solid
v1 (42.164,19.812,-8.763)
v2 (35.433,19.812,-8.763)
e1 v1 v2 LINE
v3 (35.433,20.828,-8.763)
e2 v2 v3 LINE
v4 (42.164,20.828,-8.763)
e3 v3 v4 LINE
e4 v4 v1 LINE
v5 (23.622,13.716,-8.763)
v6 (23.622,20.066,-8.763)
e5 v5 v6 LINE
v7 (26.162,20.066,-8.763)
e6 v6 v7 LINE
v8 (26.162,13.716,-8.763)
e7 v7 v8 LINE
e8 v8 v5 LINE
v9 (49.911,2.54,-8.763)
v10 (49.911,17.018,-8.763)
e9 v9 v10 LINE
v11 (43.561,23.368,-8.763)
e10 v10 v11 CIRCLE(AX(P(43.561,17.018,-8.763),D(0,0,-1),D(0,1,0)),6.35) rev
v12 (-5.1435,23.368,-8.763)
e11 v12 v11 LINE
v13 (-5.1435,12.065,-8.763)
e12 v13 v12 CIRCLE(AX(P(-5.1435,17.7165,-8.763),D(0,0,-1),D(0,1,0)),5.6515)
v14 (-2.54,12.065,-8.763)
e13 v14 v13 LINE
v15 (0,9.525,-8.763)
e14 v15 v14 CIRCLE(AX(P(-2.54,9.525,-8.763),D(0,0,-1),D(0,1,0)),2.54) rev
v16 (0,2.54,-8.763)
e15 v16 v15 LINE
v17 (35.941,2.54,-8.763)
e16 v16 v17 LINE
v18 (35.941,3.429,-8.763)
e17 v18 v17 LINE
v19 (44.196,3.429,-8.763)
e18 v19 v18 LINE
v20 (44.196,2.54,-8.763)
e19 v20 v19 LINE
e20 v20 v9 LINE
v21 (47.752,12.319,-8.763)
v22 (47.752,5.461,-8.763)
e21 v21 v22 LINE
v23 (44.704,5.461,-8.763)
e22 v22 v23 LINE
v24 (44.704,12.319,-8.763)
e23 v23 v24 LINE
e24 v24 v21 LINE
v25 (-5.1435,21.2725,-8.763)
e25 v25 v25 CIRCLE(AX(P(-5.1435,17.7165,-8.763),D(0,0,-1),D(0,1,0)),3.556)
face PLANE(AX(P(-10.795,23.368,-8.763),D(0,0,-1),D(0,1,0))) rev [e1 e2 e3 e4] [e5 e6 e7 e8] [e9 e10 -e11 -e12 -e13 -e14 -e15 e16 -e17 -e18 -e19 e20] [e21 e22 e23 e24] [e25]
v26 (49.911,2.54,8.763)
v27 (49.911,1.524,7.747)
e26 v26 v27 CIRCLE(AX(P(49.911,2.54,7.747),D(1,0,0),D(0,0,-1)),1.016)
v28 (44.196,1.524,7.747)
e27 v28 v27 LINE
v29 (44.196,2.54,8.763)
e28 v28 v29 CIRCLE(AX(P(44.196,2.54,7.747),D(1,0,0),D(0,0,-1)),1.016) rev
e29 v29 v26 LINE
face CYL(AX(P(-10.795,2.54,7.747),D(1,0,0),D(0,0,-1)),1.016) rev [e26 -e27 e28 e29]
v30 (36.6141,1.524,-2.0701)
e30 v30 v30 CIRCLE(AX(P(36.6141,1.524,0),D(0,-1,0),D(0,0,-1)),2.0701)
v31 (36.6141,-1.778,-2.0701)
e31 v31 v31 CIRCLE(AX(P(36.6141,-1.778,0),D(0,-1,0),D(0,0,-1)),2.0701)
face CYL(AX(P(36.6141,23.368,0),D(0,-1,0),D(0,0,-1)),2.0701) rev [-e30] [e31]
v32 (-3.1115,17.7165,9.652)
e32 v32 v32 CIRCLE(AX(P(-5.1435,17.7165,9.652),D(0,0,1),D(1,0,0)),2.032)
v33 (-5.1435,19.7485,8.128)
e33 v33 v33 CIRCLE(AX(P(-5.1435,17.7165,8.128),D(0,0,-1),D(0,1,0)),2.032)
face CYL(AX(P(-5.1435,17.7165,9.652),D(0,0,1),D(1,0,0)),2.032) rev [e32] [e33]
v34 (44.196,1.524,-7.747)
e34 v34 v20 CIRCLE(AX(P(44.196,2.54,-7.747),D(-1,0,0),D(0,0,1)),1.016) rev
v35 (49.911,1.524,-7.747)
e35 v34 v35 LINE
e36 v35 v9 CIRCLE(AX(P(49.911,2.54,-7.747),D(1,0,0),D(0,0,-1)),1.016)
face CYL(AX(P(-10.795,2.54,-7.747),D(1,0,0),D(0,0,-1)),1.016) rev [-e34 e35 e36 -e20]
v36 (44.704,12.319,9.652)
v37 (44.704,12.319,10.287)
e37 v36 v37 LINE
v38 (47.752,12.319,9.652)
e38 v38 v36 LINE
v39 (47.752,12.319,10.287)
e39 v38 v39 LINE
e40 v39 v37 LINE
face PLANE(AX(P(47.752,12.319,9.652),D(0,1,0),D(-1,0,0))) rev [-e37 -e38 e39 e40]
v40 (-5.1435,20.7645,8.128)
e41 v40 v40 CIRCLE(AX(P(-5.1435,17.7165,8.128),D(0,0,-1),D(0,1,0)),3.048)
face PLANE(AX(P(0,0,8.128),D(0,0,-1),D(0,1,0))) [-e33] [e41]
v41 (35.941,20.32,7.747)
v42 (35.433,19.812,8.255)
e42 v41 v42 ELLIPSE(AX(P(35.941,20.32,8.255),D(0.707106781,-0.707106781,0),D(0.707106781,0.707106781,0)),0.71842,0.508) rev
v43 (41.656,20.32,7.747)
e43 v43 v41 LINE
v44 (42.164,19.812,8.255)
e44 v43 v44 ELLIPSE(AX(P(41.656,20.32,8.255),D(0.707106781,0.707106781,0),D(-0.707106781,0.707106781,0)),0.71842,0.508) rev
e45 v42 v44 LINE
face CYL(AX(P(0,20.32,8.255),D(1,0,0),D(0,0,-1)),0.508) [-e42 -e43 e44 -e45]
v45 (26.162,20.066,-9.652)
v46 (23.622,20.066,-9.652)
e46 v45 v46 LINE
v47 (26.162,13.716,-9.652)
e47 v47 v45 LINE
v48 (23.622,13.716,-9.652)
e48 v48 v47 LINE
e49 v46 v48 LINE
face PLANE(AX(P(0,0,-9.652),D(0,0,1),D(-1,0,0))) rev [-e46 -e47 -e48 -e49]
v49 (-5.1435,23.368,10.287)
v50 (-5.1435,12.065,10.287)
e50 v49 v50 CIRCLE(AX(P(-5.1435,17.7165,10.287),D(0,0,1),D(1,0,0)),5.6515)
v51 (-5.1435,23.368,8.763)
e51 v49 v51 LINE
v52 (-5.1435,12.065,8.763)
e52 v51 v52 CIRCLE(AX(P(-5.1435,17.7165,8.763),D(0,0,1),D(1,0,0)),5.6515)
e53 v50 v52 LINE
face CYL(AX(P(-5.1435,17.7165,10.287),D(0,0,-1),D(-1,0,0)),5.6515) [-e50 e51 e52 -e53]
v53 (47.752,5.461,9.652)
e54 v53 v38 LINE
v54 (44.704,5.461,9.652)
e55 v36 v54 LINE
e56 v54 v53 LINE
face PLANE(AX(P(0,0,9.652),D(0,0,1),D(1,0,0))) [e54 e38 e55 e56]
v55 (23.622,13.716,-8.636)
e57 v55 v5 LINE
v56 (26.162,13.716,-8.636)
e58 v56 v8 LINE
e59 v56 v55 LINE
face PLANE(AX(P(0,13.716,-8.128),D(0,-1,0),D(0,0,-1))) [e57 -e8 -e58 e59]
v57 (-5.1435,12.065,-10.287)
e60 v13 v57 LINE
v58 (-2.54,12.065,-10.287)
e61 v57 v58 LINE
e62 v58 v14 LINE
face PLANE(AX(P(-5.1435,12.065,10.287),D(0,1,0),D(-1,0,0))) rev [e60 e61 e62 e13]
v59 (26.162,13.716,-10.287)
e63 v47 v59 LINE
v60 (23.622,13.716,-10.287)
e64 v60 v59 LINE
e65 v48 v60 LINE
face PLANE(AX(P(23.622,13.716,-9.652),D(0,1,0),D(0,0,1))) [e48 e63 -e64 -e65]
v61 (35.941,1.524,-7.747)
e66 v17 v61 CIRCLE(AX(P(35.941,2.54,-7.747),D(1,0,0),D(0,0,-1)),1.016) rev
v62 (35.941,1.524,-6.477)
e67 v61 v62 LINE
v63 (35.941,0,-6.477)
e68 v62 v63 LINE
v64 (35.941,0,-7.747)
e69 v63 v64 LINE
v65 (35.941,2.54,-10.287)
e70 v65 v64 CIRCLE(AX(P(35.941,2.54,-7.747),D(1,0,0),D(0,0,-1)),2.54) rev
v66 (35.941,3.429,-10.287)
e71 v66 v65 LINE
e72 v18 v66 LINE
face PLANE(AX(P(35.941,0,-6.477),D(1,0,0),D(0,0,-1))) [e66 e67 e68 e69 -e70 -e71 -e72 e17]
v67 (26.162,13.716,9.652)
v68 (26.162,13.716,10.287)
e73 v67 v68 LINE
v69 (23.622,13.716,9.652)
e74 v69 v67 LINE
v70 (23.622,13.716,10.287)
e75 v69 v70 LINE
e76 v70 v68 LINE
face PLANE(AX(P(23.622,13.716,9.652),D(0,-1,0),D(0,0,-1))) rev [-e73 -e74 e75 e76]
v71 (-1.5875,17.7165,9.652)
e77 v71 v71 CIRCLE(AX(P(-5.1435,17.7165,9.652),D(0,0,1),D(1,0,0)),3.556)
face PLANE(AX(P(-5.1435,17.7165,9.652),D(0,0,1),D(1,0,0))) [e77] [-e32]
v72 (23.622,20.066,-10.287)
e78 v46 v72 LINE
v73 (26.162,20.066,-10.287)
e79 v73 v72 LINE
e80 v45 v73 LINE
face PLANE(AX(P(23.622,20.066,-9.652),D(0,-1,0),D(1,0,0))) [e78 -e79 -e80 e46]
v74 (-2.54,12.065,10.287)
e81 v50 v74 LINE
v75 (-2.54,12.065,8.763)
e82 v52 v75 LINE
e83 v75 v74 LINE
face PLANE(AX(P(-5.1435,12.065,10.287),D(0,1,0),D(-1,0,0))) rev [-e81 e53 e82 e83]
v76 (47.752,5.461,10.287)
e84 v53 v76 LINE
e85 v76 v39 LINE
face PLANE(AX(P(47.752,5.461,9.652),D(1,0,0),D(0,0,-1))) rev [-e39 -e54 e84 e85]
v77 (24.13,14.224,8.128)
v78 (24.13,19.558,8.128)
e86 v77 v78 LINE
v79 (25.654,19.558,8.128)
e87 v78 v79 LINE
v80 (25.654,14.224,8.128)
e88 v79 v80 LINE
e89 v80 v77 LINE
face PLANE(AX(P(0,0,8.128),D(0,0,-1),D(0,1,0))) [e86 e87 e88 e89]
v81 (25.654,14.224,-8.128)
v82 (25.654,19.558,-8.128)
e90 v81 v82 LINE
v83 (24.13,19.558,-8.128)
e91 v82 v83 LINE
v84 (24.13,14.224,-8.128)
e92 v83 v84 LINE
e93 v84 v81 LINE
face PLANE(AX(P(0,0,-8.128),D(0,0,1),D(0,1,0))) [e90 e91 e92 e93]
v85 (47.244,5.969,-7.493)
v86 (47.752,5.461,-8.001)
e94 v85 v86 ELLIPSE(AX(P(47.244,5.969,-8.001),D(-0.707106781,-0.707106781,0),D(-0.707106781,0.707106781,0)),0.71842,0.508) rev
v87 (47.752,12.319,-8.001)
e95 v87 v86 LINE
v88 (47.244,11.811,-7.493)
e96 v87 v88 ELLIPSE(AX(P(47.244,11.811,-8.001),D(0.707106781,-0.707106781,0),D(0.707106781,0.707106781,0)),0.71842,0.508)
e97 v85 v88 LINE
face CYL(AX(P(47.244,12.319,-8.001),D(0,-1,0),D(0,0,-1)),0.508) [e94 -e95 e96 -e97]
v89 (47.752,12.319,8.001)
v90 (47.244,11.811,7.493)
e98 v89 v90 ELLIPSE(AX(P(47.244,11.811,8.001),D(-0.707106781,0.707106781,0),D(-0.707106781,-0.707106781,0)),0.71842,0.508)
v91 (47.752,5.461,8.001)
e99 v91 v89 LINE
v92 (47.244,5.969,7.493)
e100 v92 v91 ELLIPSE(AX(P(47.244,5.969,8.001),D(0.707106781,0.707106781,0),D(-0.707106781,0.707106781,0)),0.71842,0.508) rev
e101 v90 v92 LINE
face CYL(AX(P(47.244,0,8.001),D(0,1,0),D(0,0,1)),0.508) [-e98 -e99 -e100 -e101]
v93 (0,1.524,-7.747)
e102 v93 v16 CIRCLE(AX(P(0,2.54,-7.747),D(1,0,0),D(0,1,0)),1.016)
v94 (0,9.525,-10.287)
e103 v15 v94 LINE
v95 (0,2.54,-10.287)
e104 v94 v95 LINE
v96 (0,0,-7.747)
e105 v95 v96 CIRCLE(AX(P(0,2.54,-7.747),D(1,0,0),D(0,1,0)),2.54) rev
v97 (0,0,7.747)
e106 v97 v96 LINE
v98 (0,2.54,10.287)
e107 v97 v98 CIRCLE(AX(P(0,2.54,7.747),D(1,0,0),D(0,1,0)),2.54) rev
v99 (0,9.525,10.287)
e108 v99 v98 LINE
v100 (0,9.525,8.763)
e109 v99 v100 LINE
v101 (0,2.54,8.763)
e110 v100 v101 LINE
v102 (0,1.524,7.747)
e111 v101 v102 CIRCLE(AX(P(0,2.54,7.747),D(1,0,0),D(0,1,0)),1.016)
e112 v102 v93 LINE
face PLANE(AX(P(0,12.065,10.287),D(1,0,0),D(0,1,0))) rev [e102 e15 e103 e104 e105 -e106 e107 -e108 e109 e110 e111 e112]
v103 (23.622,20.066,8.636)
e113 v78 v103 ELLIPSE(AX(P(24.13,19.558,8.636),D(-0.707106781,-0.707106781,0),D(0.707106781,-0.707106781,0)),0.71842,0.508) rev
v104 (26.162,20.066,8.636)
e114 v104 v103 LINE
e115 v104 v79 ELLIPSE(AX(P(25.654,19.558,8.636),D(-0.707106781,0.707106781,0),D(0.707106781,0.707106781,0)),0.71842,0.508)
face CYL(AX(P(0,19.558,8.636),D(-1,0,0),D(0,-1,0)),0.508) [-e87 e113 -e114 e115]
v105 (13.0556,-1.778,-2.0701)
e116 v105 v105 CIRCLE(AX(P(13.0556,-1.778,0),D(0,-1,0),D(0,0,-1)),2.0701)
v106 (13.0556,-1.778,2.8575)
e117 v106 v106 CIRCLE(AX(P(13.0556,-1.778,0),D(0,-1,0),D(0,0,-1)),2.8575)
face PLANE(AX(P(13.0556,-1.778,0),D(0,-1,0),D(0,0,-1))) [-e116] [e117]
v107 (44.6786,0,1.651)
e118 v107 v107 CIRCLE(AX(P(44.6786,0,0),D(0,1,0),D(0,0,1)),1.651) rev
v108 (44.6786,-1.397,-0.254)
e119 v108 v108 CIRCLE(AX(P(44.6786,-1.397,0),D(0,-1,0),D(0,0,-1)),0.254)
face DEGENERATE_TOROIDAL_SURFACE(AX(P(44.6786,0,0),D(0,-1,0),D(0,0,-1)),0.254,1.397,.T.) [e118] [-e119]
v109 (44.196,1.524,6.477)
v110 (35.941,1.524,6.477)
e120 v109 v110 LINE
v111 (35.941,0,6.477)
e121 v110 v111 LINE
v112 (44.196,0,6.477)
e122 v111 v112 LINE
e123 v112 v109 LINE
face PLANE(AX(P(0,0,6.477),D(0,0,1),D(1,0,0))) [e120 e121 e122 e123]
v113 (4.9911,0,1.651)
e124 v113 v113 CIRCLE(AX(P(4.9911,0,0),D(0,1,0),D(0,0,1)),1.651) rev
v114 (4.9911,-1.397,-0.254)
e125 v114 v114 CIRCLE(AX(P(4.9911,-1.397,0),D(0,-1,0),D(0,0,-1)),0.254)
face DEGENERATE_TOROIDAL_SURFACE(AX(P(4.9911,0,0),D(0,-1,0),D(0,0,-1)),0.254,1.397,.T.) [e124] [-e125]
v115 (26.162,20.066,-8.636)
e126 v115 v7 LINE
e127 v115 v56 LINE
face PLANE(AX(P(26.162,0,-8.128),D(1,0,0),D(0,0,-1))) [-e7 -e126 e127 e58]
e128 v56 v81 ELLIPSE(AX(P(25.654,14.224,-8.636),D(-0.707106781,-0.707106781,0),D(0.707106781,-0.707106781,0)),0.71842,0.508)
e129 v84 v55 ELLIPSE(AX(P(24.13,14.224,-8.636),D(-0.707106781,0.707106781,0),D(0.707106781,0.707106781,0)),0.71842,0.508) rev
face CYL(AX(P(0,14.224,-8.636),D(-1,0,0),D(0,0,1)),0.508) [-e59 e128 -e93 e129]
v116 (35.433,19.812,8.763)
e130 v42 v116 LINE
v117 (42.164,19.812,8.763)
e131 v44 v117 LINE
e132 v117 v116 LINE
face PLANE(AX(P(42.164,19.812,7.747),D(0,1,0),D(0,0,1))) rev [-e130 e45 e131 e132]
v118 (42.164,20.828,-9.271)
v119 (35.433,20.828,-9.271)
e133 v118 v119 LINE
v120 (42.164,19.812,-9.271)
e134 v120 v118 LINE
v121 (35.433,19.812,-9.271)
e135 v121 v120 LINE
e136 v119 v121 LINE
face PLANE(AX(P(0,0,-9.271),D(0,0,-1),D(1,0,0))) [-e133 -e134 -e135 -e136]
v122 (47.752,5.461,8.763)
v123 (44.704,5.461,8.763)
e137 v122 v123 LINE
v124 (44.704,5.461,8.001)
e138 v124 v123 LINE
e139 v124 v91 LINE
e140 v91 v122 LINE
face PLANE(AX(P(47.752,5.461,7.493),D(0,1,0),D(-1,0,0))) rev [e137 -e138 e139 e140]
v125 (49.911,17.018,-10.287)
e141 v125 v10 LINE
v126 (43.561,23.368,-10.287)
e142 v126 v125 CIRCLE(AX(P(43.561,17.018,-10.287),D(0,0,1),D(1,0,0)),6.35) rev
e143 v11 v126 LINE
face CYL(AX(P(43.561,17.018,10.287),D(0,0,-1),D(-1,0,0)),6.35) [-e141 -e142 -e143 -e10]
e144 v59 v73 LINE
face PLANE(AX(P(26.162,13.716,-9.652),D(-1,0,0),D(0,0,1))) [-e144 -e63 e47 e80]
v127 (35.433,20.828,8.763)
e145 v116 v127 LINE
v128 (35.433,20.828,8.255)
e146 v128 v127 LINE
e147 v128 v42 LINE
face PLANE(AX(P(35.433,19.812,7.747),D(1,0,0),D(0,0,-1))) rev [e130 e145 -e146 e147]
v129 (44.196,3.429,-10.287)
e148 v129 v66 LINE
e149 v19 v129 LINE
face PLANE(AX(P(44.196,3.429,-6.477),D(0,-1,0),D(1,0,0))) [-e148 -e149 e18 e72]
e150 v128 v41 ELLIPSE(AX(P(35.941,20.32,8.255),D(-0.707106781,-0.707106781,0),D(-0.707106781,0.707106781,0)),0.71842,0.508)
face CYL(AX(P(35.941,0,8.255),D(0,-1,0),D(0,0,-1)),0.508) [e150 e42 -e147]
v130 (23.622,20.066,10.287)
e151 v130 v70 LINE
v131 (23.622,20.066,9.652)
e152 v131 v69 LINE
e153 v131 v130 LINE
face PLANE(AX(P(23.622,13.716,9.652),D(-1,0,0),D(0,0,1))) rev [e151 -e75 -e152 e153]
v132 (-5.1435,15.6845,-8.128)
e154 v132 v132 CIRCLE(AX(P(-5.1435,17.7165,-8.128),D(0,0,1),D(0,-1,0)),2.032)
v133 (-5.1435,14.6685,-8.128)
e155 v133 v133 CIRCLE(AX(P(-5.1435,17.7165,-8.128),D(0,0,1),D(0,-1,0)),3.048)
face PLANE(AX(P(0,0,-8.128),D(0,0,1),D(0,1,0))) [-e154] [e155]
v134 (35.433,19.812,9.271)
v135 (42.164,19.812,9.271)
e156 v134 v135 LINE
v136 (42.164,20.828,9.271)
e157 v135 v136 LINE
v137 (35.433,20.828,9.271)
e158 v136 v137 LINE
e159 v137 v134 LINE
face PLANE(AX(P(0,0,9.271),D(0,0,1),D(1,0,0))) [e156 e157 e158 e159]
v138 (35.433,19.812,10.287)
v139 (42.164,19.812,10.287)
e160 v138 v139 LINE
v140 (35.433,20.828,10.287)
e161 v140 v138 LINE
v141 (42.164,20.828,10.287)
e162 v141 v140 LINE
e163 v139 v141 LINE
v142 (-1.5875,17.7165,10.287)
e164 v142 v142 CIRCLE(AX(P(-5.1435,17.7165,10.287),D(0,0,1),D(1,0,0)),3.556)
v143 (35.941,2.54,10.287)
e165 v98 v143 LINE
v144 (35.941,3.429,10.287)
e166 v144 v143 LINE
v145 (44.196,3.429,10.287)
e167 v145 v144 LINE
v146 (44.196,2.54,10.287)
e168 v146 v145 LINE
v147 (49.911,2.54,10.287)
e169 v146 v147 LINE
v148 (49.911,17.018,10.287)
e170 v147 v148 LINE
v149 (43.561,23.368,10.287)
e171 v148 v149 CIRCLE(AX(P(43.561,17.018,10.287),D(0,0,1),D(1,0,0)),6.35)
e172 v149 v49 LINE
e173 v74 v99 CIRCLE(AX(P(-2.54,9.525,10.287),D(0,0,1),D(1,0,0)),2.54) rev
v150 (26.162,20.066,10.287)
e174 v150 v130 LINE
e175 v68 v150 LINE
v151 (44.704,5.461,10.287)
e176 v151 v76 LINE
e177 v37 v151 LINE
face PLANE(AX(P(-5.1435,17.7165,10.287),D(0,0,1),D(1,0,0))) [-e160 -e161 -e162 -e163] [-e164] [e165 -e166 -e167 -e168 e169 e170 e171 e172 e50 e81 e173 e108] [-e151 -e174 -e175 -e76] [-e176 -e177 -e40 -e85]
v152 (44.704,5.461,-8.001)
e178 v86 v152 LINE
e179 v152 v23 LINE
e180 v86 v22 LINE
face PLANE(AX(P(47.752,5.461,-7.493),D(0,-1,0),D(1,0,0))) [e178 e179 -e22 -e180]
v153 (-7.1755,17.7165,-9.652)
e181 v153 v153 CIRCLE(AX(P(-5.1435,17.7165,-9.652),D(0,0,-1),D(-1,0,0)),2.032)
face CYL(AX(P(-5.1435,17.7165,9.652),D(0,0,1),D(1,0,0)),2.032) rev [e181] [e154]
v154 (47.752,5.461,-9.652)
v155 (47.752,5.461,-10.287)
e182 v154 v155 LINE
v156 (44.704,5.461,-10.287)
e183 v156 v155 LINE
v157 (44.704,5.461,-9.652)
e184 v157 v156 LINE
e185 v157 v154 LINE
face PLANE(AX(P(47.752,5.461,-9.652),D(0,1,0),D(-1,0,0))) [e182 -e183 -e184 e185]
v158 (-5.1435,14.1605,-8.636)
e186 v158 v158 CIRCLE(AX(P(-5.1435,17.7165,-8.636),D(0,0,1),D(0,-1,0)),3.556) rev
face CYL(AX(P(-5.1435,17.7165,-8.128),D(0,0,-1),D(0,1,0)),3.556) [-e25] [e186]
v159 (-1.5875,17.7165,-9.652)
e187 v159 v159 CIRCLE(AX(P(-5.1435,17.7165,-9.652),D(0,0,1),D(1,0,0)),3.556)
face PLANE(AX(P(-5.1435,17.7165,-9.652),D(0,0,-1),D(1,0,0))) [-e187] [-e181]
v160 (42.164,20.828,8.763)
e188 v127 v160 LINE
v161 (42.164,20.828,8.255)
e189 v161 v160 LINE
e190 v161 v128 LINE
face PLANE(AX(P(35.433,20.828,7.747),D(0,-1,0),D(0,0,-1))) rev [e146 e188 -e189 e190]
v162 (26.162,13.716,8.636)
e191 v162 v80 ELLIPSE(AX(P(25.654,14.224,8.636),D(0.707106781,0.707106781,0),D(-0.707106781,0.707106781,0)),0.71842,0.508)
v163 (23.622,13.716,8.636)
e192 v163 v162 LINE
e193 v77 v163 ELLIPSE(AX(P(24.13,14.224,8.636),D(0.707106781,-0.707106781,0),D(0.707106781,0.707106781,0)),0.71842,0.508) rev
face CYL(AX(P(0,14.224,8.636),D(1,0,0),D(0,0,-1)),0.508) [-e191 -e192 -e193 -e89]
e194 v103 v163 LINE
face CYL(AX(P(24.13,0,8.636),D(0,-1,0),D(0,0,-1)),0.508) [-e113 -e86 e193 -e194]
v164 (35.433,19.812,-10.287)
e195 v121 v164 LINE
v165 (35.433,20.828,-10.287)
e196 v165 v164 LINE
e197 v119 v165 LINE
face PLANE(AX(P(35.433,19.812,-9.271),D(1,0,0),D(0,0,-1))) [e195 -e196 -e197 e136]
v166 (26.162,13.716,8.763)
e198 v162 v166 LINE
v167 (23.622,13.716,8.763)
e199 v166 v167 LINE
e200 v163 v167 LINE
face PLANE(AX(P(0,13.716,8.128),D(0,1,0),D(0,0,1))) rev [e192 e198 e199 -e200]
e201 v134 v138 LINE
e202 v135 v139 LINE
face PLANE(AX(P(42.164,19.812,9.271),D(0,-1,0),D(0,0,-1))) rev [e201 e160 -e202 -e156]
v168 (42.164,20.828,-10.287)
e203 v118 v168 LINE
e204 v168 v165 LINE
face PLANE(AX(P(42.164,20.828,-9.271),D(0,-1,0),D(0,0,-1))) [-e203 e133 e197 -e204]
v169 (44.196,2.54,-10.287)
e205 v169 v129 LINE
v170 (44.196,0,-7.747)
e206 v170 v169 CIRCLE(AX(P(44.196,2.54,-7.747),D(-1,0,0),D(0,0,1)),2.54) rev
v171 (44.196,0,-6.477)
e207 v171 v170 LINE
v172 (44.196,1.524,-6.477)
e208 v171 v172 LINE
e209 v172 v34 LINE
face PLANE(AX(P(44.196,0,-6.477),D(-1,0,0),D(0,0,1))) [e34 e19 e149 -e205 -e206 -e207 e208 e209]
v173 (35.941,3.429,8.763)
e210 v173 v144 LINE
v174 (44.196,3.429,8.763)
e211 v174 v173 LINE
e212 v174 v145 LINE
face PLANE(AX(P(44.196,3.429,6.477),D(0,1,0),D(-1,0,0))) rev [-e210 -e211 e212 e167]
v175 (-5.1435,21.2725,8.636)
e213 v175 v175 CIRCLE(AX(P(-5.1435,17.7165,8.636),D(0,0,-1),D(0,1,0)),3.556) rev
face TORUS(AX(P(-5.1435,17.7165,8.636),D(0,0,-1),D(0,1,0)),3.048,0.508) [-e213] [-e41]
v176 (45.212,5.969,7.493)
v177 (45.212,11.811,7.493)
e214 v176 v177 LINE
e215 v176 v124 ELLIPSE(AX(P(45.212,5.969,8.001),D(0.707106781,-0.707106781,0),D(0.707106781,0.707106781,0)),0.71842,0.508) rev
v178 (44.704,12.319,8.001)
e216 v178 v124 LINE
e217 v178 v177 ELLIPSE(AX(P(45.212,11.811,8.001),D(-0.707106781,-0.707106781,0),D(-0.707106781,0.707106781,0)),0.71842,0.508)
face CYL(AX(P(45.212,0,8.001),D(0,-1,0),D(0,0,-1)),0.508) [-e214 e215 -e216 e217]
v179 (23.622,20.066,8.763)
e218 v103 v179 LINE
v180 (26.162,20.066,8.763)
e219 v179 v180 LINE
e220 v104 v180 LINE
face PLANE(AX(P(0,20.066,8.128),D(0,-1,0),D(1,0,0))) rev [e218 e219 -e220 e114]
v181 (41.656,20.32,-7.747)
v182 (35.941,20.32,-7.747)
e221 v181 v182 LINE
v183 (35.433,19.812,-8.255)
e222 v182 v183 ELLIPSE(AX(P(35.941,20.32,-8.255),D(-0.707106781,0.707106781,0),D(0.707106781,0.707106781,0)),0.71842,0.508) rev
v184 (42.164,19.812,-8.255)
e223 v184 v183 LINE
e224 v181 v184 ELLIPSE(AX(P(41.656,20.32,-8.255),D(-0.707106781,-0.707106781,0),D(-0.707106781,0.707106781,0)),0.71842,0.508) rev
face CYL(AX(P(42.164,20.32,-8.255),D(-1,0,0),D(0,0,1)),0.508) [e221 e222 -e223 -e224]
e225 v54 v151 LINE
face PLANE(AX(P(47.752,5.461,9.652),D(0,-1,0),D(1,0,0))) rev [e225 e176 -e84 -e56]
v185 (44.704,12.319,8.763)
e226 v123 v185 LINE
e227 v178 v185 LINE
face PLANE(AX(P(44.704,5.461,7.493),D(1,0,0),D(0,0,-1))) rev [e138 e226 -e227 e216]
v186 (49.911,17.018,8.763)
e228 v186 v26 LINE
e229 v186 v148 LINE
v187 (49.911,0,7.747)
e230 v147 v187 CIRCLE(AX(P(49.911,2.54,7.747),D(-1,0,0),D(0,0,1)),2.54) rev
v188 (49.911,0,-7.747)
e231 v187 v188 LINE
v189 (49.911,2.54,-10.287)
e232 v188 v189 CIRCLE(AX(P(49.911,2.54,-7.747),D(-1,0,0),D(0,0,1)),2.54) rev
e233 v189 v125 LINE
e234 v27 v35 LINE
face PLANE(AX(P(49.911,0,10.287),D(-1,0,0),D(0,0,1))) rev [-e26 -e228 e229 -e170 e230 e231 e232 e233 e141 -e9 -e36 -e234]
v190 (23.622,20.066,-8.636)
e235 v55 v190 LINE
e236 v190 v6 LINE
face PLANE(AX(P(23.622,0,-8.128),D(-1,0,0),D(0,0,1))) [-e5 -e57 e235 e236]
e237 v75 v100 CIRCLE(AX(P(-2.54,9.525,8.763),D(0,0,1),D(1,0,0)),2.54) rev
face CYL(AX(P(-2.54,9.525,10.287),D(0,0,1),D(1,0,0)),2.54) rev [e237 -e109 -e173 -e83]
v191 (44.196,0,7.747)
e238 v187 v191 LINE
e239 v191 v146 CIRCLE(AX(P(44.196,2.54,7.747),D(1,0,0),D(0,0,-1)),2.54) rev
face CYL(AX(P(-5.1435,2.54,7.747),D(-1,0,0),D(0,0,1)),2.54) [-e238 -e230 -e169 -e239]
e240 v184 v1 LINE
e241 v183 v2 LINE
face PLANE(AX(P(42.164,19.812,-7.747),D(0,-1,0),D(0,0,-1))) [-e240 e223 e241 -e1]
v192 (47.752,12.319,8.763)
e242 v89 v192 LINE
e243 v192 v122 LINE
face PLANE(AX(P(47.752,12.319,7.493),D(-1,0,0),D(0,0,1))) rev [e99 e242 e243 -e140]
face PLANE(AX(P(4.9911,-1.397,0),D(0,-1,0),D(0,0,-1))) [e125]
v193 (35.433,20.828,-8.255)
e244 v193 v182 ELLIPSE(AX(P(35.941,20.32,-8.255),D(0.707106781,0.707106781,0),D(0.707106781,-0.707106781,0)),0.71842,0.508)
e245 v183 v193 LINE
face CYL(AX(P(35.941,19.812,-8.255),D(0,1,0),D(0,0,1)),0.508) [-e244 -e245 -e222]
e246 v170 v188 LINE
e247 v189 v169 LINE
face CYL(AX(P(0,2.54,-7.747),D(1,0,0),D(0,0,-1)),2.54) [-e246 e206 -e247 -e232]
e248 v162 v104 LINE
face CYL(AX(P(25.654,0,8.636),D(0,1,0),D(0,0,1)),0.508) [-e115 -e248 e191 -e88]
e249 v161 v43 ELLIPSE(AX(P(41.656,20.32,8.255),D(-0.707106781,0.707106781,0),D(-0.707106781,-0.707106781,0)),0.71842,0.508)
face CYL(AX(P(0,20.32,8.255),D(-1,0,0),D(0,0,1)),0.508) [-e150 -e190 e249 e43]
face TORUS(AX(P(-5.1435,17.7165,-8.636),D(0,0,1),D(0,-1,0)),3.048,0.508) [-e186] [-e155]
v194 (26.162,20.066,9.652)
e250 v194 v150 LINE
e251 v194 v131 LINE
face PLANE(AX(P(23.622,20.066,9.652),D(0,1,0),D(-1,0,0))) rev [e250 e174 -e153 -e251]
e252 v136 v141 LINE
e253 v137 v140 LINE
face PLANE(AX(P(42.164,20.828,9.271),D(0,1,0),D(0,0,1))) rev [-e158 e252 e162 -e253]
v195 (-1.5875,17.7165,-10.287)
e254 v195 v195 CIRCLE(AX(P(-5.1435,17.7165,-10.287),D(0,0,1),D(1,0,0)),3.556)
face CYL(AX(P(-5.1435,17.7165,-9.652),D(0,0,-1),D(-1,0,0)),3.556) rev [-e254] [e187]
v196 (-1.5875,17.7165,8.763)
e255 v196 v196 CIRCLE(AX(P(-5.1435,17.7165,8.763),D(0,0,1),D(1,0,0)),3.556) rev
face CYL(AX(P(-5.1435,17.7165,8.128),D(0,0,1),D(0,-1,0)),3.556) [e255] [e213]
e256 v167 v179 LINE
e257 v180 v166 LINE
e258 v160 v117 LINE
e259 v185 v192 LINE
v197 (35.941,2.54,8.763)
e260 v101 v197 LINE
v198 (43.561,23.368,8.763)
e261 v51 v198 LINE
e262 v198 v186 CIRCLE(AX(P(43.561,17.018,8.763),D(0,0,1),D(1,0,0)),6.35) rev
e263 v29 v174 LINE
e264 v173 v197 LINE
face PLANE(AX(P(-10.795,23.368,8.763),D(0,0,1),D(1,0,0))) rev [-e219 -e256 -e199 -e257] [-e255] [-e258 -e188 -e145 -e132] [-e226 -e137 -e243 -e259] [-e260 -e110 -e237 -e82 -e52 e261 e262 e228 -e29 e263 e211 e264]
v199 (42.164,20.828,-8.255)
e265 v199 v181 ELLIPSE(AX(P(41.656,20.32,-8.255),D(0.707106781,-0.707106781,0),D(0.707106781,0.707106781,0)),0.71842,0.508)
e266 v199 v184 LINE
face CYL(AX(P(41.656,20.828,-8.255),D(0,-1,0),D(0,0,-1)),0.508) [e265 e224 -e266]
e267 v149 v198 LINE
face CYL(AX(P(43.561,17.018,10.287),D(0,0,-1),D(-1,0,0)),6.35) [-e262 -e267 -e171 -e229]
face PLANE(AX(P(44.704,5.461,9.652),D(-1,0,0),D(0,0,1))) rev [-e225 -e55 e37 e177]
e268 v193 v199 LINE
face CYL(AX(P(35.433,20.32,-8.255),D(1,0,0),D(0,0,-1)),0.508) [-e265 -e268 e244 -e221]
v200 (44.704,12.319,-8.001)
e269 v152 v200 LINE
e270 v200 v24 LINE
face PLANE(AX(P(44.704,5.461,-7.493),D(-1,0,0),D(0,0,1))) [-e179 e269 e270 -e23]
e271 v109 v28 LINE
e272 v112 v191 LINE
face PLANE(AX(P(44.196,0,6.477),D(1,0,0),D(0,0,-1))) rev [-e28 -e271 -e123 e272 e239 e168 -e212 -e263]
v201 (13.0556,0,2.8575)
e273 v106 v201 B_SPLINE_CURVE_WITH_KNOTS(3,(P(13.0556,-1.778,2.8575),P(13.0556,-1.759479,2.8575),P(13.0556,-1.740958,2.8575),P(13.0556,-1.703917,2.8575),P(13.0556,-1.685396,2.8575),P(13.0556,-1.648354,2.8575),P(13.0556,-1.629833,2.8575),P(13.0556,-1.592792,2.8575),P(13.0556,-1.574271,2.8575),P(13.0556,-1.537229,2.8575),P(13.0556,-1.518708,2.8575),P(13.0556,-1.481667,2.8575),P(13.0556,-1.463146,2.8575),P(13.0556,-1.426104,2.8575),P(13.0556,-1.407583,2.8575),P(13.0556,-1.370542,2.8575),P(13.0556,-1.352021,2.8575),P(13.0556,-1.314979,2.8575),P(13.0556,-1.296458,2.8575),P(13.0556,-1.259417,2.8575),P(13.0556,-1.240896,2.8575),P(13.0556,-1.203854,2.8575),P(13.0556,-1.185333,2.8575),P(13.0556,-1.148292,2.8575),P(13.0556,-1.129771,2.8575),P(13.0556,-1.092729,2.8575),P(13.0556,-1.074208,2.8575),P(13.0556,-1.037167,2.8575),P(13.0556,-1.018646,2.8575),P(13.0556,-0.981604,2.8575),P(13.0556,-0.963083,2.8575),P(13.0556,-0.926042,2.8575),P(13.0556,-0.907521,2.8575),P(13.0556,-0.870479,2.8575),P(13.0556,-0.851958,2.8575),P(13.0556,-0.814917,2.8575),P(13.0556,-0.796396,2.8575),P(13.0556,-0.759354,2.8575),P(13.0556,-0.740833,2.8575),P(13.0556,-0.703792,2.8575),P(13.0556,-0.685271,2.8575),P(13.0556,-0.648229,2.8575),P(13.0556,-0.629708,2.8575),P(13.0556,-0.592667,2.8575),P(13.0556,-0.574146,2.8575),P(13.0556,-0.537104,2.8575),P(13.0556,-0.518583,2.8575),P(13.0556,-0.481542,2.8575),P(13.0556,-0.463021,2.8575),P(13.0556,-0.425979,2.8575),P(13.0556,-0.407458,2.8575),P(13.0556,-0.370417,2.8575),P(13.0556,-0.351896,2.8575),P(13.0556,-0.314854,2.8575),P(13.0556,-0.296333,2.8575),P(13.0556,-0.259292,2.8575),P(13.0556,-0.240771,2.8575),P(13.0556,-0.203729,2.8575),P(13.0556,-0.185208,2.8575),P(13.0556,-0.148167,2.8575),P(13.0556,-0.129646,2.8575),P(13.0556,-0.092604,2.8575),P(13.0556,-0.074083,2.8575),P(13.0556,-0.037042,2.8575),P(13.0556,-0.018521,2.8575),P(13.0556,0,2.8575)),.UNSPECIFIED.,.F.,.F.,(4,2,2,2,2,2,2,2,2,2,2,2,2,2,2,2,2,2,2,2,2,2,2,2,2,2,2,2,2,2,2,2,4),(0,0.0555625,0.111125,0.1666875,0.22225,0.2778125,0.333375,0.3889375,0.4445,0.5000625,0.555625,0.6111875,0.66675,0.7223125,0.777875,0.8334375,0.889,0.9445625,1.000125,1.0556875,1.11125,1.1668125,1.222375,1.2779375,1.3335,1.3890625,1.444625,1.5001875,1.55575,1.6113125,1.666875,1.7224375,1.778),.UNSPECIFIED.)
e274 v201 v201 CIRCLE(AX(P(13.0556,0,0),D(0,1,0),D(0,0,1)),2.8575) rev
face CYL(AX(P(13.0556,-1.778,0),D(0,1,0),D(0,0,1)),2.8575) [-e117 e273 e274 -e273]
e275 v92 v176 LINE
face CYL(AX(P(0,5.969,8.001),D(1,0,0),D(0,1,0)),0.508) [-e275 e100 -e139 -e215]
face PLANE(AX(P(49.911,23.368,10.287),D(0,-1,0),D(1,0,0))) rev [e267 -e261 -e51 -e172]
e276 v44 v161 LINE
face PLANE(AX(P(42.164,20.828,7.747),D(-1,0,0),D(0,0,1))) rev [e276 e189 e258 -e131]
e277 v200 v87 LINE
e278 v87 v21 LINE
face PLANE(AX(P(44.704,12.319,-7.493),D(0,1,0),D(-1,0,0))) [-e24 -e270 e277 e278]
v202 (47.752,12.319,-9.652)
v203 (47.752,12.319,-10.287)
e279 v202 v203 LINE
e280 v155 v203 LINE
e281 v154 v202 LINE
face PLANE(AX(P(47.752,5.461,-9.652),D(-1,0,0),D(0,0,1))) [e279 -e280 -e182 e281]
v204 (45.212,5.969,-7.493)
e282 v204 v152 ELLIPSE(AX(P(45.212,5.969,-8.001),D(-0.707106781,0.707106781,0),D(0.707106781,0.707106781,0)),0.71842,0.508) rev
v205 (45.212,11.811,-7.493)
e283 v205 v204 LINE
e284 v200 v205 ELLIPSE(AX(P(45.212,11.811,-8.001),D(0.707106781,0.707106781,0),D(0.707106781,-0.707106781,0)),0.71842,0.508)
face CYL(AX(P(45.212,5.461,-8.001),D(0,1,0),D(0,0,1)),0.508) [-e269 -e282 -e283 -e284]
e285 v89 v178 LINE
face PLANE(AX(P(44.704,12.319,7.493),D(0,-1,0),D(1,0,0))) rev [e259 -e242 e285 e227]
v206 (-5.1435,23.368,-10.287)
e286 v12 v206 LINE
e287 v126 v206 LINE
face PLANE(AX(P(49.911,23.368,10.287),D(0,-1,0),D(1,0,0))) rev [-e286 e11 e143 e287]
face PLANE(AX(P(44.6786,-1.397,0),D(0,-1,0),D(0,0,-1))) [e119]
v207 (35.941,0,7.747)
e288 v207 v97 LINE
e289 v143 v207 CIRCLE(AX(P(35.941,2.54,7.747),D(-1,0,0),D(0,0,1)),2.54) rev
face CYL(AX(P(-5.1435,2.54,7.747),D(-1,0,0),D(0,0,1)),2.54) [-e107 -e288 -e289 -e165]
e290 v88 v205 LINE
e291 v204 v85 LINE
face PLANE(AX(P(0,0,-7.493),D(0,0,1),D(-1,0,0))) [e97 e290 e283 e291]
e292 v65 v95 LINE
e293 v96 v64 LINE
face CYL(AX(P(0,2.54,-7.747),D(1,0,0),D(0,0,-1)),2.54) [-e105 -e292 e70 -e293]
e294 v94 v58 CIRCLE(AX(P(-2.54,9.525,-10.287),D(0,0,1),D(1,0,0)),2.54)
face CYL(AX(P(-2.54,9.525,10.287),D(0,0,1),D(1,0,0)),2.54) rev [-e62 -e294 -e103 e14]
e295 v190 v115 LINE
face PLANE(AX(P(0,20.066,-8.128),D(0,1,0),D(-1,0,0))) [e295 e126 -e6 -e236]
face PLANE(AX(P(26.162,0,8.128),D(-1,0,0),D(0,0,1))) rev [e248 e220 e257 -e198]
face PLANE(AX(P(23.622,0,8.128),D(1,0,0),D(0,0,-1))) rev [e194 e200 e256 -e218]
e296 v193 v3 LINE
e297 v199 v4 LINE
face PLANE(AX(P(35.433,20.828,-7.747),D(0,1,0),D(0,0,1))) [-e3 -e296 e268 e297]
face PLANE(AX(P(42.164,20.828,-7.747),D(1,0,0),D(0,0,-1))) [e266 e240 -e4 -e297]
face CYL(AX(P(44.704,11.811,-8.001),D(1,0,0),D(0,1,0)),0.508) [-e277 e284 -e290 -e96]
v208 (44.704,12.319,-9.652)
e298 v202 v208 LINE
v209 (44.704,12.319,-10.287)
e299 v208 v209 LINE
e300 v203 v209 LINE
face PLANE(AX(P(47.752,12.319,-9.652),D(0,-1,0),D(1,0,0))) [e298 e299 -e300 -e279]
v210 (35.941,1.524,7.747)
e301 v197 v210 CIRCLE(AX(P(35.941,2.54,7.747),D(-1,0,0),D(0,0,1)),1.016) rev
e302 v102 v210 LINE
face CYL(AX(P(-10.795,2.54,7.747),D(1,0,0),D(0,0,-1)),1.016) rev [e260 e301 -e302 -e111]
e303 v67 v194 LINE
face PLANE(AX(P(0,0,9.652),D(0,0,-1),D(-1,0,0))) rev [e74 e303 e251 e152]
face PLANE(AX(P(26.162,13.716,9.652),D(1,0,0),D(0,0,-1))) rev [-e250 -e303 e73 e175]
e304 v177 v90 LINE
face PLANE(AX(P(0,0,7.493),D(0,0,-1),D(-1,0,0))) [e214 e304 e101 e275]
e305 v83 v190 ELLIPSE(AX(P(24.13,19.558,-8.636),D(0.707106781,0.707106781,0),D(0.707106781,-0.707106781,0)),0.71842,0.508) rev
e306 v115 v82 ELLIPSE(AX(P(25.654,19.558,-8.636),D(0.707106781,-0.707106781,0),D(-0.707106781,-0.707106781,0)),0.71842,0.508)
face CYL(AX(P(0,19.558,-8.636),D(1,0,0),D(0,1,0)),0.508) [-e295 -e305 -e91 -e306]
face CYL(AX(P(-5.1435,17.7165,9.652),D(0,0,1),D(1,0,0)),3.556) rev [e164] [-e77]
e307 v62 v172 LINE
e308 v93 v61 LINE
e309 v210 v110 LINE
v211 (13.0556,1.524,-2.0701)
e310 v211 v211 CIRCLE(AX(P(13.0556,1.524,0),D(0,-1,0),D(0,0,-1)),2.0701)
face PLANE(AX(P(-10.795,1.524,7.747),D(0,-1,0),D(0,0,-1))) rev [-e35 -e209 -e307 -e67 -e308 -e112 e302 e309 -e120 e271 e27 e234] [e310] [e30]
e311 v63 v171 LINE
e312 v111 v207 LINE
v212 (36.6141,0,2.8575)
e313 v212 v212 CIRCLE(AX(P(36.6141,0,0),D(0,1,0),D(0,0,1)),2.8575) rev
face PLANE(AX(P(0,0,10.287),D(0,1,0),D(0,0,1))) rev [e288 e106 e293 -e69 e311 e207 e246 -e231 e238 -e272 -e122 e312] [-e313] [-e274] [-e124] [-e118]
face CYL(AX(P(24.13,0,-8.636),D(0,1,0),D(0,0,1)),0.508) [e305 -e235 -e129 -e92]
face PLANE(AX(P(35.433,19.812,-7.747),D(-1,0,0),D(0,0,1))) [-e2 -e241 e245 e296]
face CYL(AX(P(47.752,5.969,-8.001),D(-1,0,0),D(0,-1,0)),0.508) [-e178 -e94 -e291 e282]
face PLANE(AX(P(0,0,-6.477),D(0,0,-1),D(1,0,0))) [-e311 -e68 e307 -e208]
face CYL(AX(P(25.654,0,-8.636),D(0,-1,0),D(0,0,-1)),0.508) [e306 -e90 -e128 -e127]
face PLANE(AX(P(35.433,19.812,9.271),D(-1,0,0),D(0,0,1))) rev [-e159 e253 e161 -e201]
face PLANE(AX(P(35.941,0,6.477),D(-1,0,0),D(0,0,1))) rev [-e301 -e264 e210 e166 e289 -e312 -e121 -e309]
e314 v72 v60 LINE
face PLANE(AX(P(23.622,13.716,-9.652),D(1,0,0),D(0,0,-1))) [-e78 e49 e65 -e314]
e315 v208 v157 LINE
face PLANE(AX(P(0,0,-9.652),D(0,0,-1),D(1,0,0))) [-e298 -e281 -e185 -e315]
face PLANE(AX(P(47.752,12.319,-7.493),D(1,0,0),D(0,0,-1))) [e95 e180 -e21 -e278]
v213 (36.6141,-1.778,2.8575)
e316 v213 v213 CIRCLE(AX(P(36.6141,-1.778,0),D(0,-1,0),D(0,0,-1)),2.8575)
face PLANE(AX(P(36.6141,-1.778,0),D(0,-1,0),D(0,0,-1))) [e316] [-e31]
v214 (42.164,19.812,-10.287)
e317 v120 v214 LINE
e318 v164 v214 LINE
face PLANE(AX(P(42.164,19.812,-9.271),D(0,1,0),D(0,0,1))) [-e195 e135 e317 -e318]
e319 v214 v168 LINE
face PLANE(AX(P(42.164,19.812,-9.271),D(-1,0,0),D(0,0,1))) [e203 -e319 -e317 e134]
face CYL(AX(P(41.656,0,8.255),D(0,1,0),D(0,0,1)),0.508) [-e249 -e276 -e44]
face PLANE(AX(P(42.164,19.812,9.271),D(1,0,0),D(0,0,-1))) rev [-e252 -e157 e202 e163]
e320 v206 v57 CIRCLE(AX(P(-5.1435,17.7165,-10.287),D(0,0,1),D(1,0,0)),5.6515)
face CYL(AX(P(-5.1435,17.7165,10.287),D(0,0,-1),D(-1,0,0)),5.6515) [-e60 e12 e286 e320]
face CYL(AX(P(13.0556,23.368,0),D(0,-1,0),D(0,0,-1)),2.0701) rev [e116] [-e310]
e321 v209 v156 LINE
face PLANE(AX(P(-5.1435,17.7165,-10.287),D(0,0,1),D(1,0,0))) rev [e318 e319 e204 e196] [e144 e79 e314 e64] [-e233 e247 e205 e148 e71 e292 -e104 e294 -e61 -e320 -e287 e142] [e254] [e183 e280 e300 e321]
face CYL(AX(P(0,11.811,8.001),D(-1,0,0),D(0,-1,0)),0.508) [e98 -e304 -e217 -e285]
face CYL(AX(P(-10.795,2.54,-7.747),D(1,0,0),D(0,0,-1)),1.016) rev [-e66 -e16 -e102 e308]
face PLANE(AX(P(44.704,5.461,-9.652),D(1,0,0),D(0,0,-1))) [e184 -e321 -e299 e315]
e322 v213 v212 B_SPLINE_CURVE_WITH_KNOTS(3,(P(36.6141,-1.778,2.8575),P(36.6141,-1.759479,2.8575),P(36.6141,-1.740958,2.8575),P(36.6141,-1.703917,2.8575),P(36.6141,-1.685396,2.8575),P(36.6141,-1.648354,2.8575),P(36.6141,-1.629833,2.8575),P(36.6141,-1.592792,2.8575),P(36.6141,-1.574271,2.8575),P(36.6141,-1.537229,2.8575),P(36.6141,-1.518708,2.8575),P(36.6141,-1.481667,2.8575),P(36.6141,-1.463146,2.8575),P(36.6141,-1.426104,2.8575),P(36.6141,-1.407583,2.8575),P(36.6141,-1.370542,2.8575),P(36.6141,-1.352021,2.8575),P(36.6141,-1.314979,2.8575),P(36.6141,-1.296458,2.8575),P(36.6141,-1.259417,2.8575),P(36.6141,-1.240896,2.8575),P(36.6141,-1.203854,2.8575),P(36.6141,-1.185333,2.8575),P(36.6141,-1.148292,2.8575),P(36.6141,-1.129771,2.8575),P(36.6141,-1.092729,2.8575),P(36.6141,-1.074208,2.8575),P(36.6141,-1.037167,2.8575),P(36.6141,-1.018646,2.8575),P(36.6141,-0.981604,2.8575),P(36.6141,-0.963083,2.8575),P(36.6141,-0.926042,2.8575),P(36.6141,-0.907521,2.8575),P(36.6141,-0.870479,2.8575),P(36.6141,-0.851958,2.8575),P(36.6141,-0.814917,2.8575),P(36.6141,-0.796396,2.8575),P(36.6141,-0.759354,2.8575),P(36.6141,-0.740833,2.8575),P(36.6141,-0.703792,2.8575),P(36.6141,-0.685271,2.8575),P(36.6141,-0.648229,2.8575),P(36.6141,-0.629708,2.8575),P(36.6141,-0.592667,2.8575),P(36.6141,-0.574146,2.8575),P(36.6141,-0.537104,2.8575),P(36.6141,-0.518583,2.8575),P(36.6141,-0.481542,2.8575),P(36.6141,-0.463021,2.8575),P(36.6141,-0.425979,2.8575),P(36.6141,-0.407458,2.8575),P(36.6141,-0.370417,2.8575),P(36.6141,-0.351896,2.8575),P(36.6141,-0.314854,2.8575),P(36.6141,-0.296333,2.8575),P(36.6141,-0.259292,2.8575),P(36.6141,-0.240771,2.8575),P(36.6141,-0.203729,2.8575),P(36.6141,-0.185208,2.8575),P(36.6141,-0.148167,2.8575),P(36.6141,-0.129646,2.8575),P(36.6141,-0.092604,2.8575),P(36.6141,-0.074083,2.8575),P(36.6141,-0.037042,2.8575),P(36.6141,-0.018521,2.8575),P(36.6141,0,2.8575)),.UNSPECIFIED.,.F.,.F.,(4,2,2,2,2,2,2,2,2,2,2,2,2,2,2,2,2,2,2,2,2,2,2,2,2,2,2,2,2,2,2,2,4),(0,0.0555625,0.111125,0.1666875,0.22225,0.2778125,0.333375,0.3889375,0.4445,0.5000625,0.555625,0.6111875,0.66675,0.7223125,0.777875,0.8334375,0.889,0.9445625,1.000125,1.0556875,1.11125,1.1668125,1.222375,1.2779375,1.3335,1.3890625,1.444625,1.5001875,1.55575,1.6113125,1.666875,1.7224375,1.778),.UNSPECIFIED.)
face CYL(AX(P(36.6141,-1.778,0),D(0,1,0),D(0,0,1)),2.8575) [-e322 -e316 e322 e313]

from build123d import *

# Parameters (mm, degrees)
BOSS_EXTRUDE1_DEPTH       = 10.287
SKETCH2_R                 = 3.556
CUT_EXTRUDE1_DEPTH        = 0.635
SKETCH3_W                 = 3.048
SKETCH3_H                 = 6.858
CUT_EXTRUDE2_DEPTH        = 0.635
SKETCH4_W                 = 6.731
SKETCH4_H                 = 1.016
CUT_EXTRUDE3_DEPTH        = 1.016
SKETCH5_W                 = 2.54
SKETCH5_H                 = 6.35
CUT_EXTRUDE4_DEPTH        = 0.635
FILLET1_R                 = 6.35
FILLET2_R                 = 2.54
CUT_EXTRUDE5_DEPTH        = 66.856694641
SKETCH9_W                 = 2.54
SKETCH9_H                 = 6.35
SKETCH9_R                 = 3.556
BOSS_EXTRUDE2_DEPTH       = 0.635
SKETCH10_W                = 6.731
SKETCH10_H                = 1.016
BOSS_EXTRUDE3_DEPTH       = 1.016
SKETCH12_W                = 3.048
SKETCH12_H                = 6.858
BOSS_EXTRUDE4_DEPTH       = 1.27
FILLET5_R                 = 0.508
FILLET5_OF_MIRROR4_R      = 0.508
F_1_0_16_DIAMETER_HOLE1_D = 4.064
SKETCH15_R                = 1.651
BOSS_EXTRUDE5_DEPTH       = 1.397
FILLET6_R                 = 1.397
SKETCH16_R                = 2.8575
BOSS_EXTRUDE6_DEPTH       = 3.302
SKETCH20_R                = 2.0701
CUT_EXTRUDE6_DEPTH        = 57.826504432
SKETCH21_W                = 8.255
SKETCH21_H                = 3.429
CUT_EXTRUDE7_DEPTH        = 3.81


with BuildPart() as part:
    # Sketch1 → Boss-Extrude1 (new, symmetric)
    with BuildSketch(Plane.XY):
        with BuildLine():
            Line((0, 0), (49.911, 0))
            Line((49.911, 0), (49.911, 23.368))
            Line((49.911, 23.368), (-5.1435, 23.368))
            ThreePointArc((-5.1435, 23.368), (-10.795, 17.7165), (-5.1435, 12.065))
            Line((-5.1435, 12.065), (0, 12.065))
            Line((0, 12.065), (0, 0))
        make_face()
    extrude(amount=BOSS_EXTRUDE1_DEPTH, both=True)

    # Sketch2 → Cut-Extrude1 (cut)
    with BuildSketch(Plane.XY.offset(10.287)):
        with Locations((-5.1435, 17.7165)):
            Circle(SKETCH2_R)
    cut_extrude1 = extrude(amount=-CUT_EXTRUDE1_DEPTH, mode=Mode.SUBTRACT)

    # Mirror1: Cut-Extrude1 across plane
    add(cut_extrude1.mirror(Plane.XY), mode=Mode.SUBTRACT)

    # Sketch3 → Cut-Extrude2 (cut)
    with BuildSketch(Plane.XY.offset(10.287)):
        with Locations((46.228, 8.89)):
            Rectangle(SKETCH3_W, SKETCH3_H)
    cut_extrude2 = extrude(amount=-CUT_EXTRUDE2_DEPTH, mode=Mode.SUBTRACT)

    # Sketch4 → Cut-Extrude3 (cut)
    with BuildSketch(Plane.XY.offset(10.287)):
        with Locations((38.7985, 20.32)):
            Rectangle(SKETCH4_W, SKETCH4_H)
    cut_extrude3 = extrude(amount=-CUT_EXTRUDE3_DEPTH, mode=Mode.SUBTRACT)

    # Sketch5 → Cut-Extrude4 (cut)
    with BuildSketch(Plane.XY.offset(10.287)):
        with Locations((24.892, 16.891)):
            Rectangle(SKETCH5_W, SKETCH5_H)
    cut_extrude4 = extrude(amount=-CUT_EXTRUDE4_DEPTH, mode=Mode.SUBTRACT)

    # Mirror2: Cut-Extrude2, Cut-Extrude3, Cut-Extrude4 across plane
    add(cut_extrude2.mirror(Plane.XY), mode=Mode.SUBTRACT)
    add(cut_extrude3.mirror(Plane.XY), mode=Mode.SUBTRACT)
    add(cut_extrude4.mirror(Plane.XY), mode=Mode.SUBTRACT)

    # Fillet1
    fillet1_edges = [part.edges().sort_by_distance(p)[0] for p in [
        (49.911, 23.368, 0),
    ]]
    fillet(fillet1_edges, radius=FILLET1_R)

    # Fillet2
    fillet2_edges = [part.edges().sort_by_distance(p)[0] for p in [
        (0, 12.065, 0),
        (24.9555, 0, -10.287),
        (24.9555, 0, 10.287),
    ]]
    fillet(fillet2_edges, radius=FILLET2_R)

    # Sketch8 → Cut-Extrude5 (cut, through all)
    with BuildSketch(Plane(origin=(49.911, 0, 0), x_dir=(0, 0, -1), z_dir=(1, 0, 0))):
        with BuildLine():
            Line((-8.763, 23.368), (-8.763, 2.54))
            ThreePointArc((-8.763, 2.54), (-8.46542049, 1.82157951), (-7.747, 1.524))
            Line((-7.747, 1.524), (7.747, 1.524))
            ThreePointArc((7.747, 1.524), (8.46542049, 1.82157951), (8.763, 2.54))
            Line((8.763, 2.54), (8.763, 23.368))
            Line((8.763, 23.368), (-8.763, 23.368))
        make_face()
    extrude(amount=-CUT_EXTRUDE5_DEPTH, mode=Mode.SUBTRACT)

    # Sketch9 → Boss-Extrude2 (add)
    with BuildSketch(Plane(origin=(0, 0, 8.763), x_dir=(-1, 0, 0), z_dir=(0, 0, -1))):
        with Locations((-24.892, 16.891)):
            Rectangle(SKETCH9_W, SKETCH9_H)
        with Locations(Location((5.1435, 17.7165, 0), (0, 0, 180))):
            Circle(SKETCH9_R)
    boss_extrude2 = extrude(amount=BOSS_EXTRUDE2_DEPTH)

    # Sketch10 → Boss-Extrude3 (add)
    with BuildSketch(Plane(origin=(0, 0, 8.763), x_dir=(-1, 0, 0), z_dir=(0, 0, -1))):
        with Locations((-38.7985, 20.32)):
            Rectangle(SKETCH10_W, SKETCH10_H)
    boss_extrude3 = extrude(amount=BOSS_EXTRUDE3_DEPTH)

    # Sketch12 → Boss-Extrude4 (add)
    with BuildSketch(Plane(origin=(0, 0, 8.763), x_dir=(-1, 0, 0), z_dir=(0, 0, -1))):
        with Locations((-46.228, 8.89)):
            Rectangle(SKETCH12_W, SKETCH12_H)
    boss_extrude4 = extrude(amount=BOSS_EXTRUDE4_DEPTH)

    # Fillet5
    fillet5_edges = [part.edges().sort_by_distance(p)[0] for p in [
        (26.162, 16.891, 8.128),
        (24.892, 13.716, 8.128),
        (23.622, 16.891, 8.128),
        (24.892, 20.066, 8.128),
        (-8.6995, 17.7165, 8.128),
        (38.7985, 20.828, 7.747),
        (42.164, 20.32, 7.747),
        (38.7985, 19.812, 7.747),
        (35.433, 20.32, 7.747),
        (46.228, 12.319, 7.493),
        (47.752, 8.89, 7.493),
        (46.228, 5.461, 7.493),
        (44.704, 8.89, 7.493),
    ]]
    fillet(fillet5_edges, radius=FILLET5_R - 0.0001)  # a hair under: the kernel refuses the full size

    # Mirror4: Boss-Extrude2, Boss-Extrude3, Boss-Extrude4 across plane
    add(boss_extrude2.mirror(Plane.XY))
    add(boss_extrude3.mirror(Plane.XY))
    add(boss_extrude4.mirror(Plane.XY))

    # Fillet5 of Mirror4
    fillet5_of_mirror4_edges = [part.edges().sort_by_distance(p)[0] for p in [
        (26.162, 16.891, -8.128),
        (24.892, 13.716, -8.128),
        (23.622, 16.891, -8.128),
        (24.892, 20.066, -8.128),
        (-8.6995, 17.7165, -8.128),
        (38.7985, 20.828, -7.747),
        (42.164, 20.32, -7.747),
        (38.7985, 19.812, -7.747),
        (35.433, 20.32, -7.747),
        (46.228, 12.319, -7.493),
        (47.752, 8.89, -7.493),
        (46.228, 5.461, -7.493),
        (44.704, 8.89, -7.493),
    ]]
    fillet(fillet5_of_mirror4_edges, radius=FILLET5_OF_MIRROR4_R - 0.0001)  # a hair under: the kernel refuses the full size

    # 1 (0.16) Diameter Hole1 (through all)
    with Locations(Plane.XY.offset(9.652)):
        with Locations((-5.1435, 17.7165)):
            Hole(F_1_0_16_DIAMETER_HOLE1_D / 2)

    # Sketch15 → Boss-Extrude5 (add)
    with BuildSketch(Plane.XZ):
        with Locations(Location((4.9911, 0, 0), (0, 0, 90))):
            Circle(SKETCH15_R)
        with Locations(Location((44.6786, 0, 0), (0, 0, 90))):
            Circle(SKETCH15_R)
    extrude(amount=BOSS_EXTRUDE5_DEPTH)

    # Fillet6
    fillet6_edges = [part.edges().sort_by_distance(p)[0] for p in [
        (4.9911, -1.397, -1.651),
        (44.6786, -1.397, -1.651),
    ]]
    fillet(fillet6_edges, radius=FILLET6_R - 0.0001)  # a hair under: the kernel refuses the full size

    # Sketch16 → Boss-Extrude6 (add)
    with BuildSketch(Plane.XZ.offset(-1.524)):
        with Locations(Location((13.0556, 0, 0), (0, 0, 90))):
            Circle(SKETCH16_R)
        with Locations(Location((36.6141, 0, 0), (0, 0, 90))):
            Circle(SKETCH16_R)
    extrude(amount=BOSS_EXTRUDE6_DEPTH)

    # Sketch20 → Cut-Extrude6 (cut, through all)
    with BuildSketch(Plane.XZ.offset(1.778)):
        with Locations(Location((13.0556, 0, 0), (0, 0, 270))):
            Circle(SKETCH20_R)
        with Locations(Location((36.6141, 0, 0), (0, 0, 270))):
            Circle(SKETCH20_R)
    extrude(amount=-CUT_EXTRUDE6_DEPTH, mode=Mode.SUBTRACT)

    # Sketch21 → Cut-Extrude7 (cut)
    with BuildSketch(Plane.XY.offset(10.287)):
        with Locations((40.0685, 1.7145)):
            Rectangle(SKETCH21_W, SKETCH21_H)
    cut_extrude7 = extrude(amount=-CUT_EXTRUDE7_DEPTH, mode=Mode.SUBTRACT)

    # Mirror5: Cut-Extrude7 across plane
    add(cut_extrude7.mirror(Plane.XY), mode=Mode.SUBTRACT)


solid = part.part
